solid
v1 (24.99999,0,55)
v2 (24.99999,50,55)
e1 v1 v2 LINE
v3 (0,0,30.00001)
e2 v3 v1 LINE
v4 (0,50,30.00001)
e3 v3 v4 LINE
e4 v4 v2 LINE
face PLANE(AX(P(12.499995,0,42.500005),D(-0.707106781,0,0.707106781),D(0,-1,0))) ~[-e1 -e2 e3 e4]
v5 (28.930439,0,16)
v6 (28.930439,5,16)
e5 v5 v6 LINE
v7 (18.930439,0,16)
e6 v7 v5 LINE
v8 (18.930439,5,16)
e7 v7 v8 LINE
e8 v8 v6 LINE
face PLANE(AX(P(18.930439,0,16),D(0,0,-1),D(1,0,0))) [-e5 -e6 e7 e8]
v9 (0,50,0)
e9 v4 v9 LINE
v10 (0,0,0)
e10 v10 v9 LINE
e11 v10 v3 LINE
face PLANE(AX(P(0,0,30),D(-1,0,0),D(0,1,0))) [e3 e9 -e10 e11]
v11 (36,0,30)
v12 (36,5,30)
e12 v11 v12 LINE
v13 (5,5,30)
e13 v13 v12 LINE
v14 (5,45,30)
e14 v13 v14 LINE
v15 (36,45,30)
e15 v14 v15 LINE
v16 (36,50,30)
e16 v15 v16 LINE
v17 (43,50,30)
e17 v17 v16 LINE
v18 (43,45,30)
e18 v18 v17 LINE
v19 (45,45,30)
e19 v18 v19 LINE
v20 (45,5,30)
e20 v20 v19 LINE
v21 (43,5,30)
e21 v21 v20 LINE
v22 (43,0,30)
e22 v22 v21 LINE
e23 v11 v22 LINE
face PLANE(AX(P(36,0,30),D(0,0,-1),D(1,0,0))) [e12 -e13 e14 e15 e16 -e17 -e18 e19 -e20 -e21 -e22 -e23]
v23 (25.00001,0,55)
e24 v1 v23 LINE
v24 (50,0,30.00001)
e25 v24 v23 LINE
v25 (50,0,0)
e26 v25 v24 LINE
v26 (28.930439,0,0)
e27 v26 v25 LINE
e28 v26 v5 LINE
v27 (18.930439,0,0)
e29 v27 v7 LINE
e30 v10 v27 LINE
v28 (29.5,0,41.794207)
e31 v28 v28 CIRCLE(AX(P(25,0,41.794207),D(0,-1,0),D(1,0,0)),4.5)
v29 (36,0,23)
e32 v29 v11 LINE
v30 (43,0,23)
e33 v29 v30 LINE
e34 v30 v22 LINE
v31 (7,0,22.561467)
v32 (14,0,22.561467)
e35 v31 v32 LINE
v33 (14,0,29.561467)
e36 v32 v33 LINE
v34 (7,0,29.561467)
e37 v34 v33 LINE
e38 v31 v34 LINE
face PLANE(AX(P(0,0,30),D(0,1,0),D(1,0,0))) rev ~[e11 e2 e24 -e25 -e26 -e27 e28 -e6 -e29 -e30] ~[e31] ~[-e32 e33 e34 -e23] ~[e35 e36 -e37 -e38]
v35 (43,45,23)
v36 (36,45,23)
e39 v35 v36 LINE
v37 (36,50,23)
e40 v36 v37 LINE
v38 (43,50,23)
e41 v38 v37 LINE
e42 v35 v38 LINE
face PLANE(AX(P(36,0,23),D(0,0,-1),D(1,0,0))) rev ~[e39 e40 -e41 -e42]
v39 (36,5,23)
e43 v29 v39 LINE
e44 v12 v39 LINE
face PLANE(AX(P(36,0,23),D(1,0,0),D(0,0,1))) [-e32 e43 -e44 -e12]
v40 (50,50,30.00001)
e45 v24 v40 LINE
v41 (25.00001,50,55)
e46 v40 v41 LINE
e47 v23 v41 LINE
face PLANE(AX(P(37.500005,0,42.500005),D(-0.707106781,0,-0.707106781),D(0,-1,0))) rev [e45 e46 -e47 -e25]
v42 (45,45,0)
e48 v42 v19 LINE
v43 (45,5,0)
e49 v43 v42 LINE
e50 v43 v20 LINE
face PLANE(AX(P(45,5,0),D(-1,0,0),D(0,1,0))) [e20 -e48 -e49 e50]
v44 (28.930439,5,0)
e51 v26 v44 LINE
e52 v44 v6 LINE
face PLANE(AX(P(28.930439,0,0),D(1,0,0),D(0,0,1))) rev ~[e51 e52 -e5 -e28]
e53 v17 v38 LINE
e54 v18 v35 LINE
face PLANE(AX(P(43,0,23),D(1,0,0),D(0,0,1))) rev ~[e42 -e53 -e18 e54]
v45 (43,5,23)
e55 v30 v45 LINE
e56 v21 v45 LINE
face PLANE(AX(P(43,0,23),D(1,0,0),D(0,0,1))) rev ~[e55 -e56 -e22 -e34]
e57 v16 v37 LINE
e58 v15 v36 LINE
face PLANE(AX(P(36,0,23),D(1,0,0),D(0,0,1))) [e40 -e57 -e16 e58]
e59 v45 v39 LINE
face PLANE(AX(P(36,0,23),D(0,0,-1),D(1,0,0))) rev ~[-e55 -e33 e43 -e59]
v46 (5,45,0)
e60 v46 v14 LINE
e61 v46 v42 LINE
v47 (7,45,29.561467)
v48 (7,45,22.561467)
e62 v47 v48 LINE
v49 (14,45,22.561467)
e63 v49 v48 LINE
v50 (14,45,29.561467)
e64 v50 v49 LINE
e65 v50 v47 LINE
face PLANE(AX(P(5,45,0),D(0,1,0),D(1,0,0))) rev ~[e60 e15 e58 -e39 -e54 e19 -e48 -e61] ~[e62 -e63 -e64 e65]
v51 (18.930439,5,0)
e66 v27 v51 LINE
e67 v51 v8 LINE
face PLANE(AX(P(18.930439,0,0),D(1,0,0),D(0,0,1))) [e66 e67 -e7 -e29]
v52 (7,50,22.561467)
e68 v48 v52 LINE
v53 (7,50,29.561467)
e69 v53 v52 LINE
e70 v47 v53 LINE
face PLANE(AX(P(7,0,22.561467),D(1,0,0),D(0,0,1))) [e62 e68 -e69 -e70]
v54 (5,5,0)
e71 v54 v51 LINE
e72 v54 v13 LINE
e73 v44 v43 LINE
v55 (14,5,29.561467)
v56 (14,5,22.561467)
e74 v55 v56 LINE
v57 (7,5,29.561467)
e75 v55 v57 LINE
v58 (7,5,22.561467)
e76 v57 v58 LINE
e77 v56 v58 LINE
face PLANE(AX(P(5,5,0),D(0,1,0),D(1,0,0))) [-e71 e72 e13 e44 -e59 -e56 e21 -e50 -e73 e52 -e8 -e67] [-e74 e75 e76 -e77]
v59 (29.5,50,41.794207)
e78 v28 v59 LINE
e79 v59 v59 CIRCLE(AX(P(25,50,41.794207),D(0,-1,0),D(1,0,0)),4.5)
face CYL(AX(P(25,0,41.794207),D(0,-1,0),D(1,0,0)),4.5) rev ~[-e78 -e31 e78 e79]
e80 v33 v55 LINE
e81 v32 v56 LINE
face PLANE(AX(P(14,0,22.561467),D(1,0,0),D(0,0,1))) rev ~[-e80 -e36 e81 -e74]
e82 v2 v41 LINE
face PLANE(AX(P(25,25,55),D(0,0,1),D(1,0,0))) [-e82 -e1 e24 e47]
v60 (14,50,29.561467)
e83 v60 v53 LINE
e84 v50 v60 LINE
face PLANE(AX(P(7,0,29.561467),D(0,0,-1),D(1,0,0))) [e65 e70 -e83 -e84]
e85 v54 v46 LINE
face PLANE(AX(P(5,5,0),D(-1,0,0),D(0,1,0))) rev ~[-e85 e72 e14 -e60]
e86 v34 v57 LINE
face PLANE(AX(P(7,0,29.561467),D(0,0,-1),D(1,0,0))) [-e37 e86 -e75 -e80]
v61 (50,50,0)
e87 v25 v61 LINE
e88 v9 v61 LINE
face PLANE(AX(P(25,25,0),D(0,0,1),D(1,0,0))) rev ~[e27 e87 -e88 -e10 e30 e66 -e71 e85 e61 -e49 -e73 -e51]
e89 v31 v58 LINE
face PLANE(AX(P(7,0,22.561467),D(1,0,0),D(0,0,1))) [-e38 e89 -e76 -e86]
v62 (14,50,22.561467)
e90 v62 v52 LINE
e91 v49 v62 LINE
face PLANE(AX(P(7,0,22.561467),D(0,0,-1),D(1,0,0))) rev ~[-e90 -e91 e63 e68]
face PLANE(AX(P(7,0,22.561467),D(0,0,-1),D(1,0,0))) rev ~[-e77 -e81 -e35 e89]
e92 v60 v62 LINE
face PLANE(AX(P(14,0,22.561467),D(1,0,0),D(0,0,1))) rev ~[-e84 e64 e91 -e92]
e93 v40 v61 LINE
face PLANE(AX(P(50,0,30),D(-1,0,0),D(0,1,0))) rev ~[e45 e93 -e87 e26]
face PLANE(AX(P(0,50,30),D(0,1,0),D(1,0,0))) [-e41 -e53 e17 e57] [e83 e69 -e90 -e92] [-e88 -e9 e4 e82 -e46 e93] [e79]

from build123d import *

# Parameters (mm, degrees)
F0_W     = 50
F0_H     = 50
F0_W_2   = 40
F0_H_2   = 40
F1_DEPTH = 30
F2_W     = 50
F2_H     = 50
F3_DEPTH = 25
F4_SIZE  = 24.99999
F5_W     = 10
F5_H     = 16
F6_DEPTH = 5
F5_W_2   = 7
F5_H_2   = 7
F7_DEPTH = 50.001
F5_R     = 4.5
F8_DEPTH = 50.001


# Not quite as in the source:
# - a fillet or chamfer is up to 0.001 mm smaller than in the source, because OpenCascade refuses the exact size


with BuildPart() as f1:
    # F0 (on Top) → F1 (new body)
    with BuildSketch(Plane.XY):
        with Locations((25, 25)):
            Rectangle(F0_W, F0_H)
        with Locations((25, 25)):
            Rectangle(F0_W_2, F0_H_2, mode=Mode.SUBTRACT)
    extrude(amount=F1_DEPTH)

    # F2 (on face) → F3 (join)
    with BuildSketch(Plane.XY.offset(30)):
        with Locations((25, 25)):
            Rectangle(F2_W, F2_H)
    extrude(amount=F3_DEPTH)

    # F4 (size 25 in the source; OpenCascade refuses exactly that, so slightly less here)
    f4_edges = [f1.edges().sort_by_distance(p)[0] for p in [
        (0, 25, 55),
        (50, 25, 55),
    ]]
    chamfer(f4_edges, length=F4_SIZE)

    # F5 (on face) → F6 (cut)
    with BuildSketch(Plane.XZ):
        with Locations((23.930438906, 8)):
            Rectangle(F5_W, F5_H)
    extrude(amount=-F6_DEPTH, mode=Mode.SUBTRACT)

    # F5 (on face) → F7 (cut, through all)
    with BuildSketch(Plane.XZ):
        with Locations((10.5, 26.0614674687)):
            Rectangle(F5_W_2, F5_H_2)
        with Locations((39.5, 26.5)):
            Rectangle(F5_W_2, F5_H_2)
    extrude(amount=-F7_DEPTH, mode=Mode.SUBTRACT)

    # F5 (on face) → F8 (cut, through all)
    with BuildSketch(Plane.XZ):
        with Locations((25, 41.7942066526)):
            Circle(F5_R)
    extrude(amount=-F8_DEPTH, mode=Mode.SUBTRACT)


solid = f1.part
